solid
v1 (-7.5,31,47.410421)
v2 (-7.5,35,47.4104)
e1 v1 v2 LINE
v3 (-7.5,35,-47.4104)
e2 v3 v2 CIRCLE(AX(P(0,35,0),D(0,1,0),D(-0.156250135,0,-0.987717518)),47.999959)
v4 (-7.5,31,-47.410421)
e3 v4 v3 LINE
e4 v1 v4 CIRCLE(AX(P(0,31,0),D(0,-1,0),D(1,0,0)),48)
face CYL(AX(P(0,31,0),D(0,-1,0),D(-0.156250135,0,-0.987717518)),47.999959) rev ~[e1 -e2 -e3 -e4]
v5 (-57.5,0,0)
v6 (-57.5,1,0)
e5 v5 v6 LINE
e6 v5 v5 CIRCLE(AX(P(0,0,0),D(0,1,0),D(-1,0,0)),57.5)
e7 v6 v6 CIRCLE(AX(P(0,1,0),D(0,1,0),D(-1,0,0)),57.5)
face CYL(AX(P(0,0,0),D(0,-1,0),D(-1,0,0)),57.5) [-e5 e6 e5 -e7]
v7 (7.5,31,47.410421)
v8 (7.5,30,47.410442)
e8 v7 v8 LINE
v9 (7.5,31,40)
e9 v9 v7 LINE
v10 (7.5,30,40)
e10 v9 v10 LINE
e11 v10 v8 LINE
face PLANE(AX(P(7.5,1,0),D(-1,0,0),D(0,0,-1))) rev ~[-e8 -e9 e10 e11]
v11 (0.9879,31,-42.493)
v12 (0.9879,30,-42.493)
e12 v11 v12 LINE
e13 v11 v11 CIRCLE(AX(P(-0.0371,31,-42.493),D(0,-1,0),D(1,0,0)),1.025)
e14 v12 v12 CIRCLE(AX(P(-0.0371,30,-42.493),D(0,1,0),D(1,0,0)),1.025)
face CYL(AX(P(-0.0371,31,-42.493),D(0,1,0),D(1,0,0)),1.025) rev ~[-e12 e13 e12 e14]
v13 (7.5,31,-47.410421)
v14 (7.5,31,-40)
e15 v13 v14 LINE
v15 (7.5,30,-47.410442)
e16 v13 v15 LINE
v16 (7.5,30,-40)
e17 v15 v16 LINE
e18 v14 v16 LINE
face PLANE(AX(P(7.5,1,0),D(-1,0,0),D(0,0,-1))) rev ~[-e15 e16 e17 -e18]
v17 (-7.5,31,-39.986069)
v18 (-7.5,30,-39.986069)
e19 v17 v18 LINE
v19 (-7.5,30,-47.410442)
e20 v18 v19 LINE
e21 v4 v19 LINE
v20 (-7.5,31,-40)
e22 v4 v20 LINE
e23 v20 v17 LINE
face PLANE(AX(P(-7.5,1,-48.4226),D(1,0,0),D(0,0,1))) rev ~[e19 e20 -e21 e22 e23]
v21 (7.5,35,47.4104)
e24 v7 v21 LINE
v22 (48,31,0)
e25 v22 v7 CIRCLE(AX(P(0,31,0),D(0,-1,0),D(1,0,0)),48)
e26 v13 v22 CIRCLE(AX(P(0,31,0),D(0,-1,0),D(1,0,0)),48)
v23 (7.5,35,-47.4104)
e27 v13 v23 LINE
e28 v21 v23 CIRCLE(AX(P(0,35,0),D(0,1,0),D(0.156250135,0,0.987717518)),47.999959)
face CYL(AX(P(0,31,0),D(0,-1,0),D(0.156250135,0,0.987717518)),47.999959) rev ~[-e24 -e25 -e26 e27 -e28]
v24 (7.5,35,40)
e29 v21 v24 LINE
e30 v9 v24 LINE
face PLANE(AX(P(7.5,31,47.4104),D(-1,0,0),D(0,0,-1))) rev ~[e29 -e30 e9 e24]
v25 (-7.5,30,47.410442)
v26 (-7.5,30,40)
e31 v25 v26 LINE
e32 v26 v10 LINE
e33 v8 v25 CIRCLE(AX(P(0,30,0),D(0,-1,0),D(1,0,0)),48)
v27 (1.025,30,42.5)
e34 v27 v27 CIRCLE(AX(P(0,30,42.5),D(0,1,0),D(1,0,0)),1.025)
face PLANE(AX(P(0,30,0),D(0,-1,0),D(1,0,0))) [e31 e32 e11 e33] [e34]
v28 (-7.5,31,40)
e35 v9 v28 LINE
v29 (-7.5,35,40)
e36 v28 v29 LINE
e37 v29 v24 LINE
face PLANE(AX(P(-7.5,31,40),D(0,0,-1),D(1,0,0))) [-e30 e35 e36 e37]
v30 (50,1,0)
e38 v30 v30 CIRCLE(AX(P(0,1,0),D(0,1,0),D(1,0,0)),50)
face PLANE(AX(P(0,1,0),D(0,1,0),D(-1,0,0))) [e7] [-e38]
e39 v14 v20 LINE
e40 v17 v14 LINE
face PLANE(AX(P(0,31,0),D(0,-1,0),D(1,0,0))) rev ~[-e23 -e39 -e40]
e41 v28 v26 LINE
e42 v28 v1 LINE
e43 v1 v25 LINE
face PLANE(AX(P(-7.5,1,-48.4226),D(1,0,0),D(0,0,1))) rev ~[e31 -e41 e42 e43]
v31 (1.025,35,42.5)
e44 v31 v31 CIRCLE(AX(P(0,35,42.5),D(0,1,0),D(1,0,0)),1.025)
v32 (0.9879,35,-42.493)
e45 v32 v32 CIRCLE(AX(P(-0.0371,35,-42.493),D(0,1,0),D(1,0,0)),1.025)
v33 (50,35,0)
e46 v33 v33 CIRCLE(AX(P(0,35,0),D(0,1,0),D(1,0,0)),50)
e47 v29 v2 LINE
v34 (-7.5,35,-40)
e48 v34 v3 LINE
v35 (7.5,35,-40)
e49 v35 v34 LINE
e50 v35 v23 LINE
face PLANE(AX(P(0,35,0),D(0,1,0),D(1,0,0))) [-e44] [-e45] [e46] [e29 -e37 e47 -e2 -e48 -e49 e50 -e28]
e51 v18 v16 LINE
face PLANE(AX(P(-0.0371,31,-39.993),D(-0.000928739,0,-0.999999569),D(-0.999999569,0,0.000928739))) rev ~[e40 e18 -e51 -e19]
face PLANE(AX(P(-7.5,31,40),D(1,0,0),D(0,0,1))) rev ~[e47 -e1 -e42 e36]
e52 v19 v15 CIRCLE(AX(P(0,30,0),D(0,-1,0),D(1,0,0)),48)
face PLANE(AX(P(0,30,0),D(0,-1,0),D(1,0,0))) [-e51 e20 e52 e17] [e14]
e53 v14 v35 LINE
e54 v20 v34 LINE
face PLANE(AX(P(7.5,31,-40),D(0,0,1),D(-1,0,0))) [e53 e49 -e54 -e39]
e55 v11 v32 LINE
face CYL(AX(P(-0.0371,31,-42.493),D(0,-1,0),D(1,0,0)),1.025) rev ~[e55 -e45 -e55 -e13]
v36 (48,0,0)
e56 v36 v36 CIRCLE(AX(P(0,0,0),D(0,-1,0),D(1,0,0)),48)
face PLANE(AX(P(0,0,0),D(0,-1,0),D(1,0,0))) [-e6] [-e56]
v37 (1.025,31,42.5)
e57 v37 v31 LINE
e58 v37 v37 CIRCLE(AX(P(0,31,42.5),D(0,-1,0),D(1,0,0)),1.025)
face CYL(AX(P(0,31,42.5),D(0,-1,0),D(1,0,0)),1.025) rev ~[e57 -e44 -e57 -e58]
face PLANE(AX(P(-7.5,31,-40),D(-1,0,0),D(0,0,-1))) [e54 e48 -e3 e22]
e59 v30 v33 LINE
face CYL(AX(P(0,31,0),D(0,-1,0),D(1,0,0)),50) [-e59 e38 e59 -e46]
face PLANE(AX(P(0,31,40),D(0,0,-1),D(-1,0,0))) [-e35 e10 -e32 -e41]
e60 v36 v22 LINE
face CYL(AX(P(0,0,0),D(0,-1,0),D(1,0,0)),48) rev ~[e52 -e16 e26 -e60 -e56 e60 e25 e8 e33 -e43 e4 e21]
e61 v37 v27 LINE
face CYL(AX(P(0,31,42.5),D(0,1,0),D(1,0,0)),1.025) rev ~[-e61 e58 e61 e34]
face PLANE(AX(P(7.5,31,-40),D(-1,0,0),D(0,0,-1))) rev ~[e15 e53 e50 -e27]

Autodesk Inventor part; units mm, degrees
ref_plane "YZ Plane" through (0, 0, 0) normal (1, 0, 0) x (0, 1, 0)
ref_plane "XZ Plane" through (0, 0, 0) normal (0, 1, 0) x (-1, 0, 0)
ref_plane "XY Plane" through (0, 0, 0) normal (0, 0, 1) x (1, 0, 0)
sketch "Sketch1" plane through (0, 0, 0) normal (0, 1, 0) x (-1, 0, 0)
  circle A0 centre (0, 0) radius 57.5
  circle A1 centre (0, 0) radius 48
  circle A2 centre (0, 0) radius 50
  line L0 (0, 0) -> (7.5, 0)
  line L1 (7.5, 0) -> (-7.5, 0)
  line L2 (-7.5, 0) -> (-7.5, -47.4104)
  line L3 (7.5, 0) -> (7.5, -47.4104)
  line L4 (7.5, 0) -> (7.5, 47.4104)
  line L5 (-7.5, 0) -> (-7.5, 47.4104)
  dimension "d0" = 115
  dimension "d1" = 96
  dimension "d2" = 100
extrude "Extrusion1" add sketch "Sketch1" along normal blind 1 contours A0 | A1 L3 L4 | L4 L0 L1 L5 A1 | A1 L2 L1 L0 L3 | L5 L2 A1 | A2
sketch "Sketch2" plane through (0, 1, 0) normal (0, 1, 0) x (1, 0, 0)
  circle A0 centre (0, 0) radius 49
  circle A1 centre (0, 0) radius 50
  line L0 (0, 0) -> (7.5, 0)
  line L1 (7.5, -48.4226) -> (7.5, 48.4226) projected
  line L2 (7.5, 0) -> (7.5, 48.4226)
  line L3 (7.5, 48.4226) -> (7.5, -48.4226)
  line L4 (-7.5, 48.4226) -> (-7.5, -48.4226)
  dimension "d7" = 98
  dimension "d8" = 100
extrude "Extrusion2" add sketch "Sketch2" along normal blind 30 contours L1 A0 L4 | A1
sketch "Sketch3" plane through (0, 0, 0) normal (0, -1, 0) x (1, 0, 0)
  circle A0 centre (0, 0) radius 49
  line L0 (0, 0) -> (0, 40)
  line L1 (0, 40) -> (0, -40)
  dimension "d11" = 98
  dimension "d12" = 40
  dimension "d13" = 80
extrude "Extrusion3" cut sketch "Sketch3" against normal blind 30
sketch "Sketch4" plane through (0, 31, 0) normal (0, 1, 0) x (1, 0, 0)
  line L0 (0, 0) -> (0, -40)
  line L1 (0, -40) -> (-7.5, -40)
  line L2 (-7.5, 48.4226) -> (-7.5, -48.4226) projected
  line L3 (7.5742, -40) -> (0, -40)
  line L4 (7.5742, -40) -> (7.5, 40)
  line L5 (7.5, -48.4226) -> (7.5, 48.4226) projected
  line L6 (7.5, 40) -> (-7.5742, 39.986)
  line L7 (-7.5742, 39.986) -> (-7.5, -40)
  line L8 (-7.5, -40) -> (-7.5742, 39.986)
  line L9 (0, -40) -> (0, -42.5)
  line L10 (-0.0371, 39.993) -> (-0.0371, 42.493)
  circle A0 centre (-0.0371, 42.493) radius 1.025
  circle A1 centre (0, -42.5) radius 1.025
  point P0 (-7.5, 39.9861)
  point P1 (7.5, -40)
  dimension "d16" = 40
  dimension "d17" = 80
  dimension "d18" = 2.5
  dimension "d19" = 2.5
  dimension "d20" = 2.05
  dimension "d21" = 2.05
extrude "Extrusion4" cut sketch "Sketch4" against normal through all contours L1 L2 L6 L5 L3 | A0 | A1
sketch "Sketch5" plane through (0, 0, 0) normal (0, -1, 0) x (1, 0, 0)
  circle A0 centre (0, 0) radius 49
  circle A1 centre (0, 0) radius 48
  dimension "d24" = 98
  dimension "d25" = 96
extrude "Extrusion5" add sketch "Sketch5" against normal blind 31
sketch "Sketch6" plane through (0, 31, 0) normal (0, 1, 0) x (1, 0, 0)
  circle A0 centre (0, 0) radius 50
  circle A1 centre (0, -42.5) radius 1.025 projected
  circle A2 centre (0, -42.5) radius 1.025
  line L0 (-7.5, -40) -> (-7.5, -47.4104) projected
  line L1 (-7.5, -47.4104) -> (-7.5, -40)
  line L2 (7.5, -47.4104) -> (7.5, -40) projected
  line L3 (-7.5, -40) -> (7.5, -40)
  line L4 (7.5, -40) -> (-7.5, -40)
  line L5 (-7.5, -47.4104) -> (-7.5, -40)
  line L6 (7.5, -40) -> (-7.5, -40)
  arc A3 (7.5, -47.4104) -> (7.5, 47.4104) centre (0, 0) ccw
  arc A4 (-7.5, 47.4104) -> (-7.5, -47.4104) centre (0, 0) ccw
  line L7 (7.5, 40) -> (7.5, 47.4104) projected
  line L8 (7.5, 47.4104) -> (7.5, 40)
  line L9 (7.5, 40) -> (-7.5, 40)
  line L10 (-7.5, 40) -> (-7.5, 47.4104)
  circle A5 centre (-0.0371, 42.493) radius 1.025 projected
  circle A6 centre (-0.0371, 42.493) radius 1.025
  dimension "d28" = 100
  dimension "d30" = 2.05
  dimension "d31" = 2.05
extrude "Extrusion6" add sketch "Sketch6" along normal blind 4
properties part number "Chassis_Support"
